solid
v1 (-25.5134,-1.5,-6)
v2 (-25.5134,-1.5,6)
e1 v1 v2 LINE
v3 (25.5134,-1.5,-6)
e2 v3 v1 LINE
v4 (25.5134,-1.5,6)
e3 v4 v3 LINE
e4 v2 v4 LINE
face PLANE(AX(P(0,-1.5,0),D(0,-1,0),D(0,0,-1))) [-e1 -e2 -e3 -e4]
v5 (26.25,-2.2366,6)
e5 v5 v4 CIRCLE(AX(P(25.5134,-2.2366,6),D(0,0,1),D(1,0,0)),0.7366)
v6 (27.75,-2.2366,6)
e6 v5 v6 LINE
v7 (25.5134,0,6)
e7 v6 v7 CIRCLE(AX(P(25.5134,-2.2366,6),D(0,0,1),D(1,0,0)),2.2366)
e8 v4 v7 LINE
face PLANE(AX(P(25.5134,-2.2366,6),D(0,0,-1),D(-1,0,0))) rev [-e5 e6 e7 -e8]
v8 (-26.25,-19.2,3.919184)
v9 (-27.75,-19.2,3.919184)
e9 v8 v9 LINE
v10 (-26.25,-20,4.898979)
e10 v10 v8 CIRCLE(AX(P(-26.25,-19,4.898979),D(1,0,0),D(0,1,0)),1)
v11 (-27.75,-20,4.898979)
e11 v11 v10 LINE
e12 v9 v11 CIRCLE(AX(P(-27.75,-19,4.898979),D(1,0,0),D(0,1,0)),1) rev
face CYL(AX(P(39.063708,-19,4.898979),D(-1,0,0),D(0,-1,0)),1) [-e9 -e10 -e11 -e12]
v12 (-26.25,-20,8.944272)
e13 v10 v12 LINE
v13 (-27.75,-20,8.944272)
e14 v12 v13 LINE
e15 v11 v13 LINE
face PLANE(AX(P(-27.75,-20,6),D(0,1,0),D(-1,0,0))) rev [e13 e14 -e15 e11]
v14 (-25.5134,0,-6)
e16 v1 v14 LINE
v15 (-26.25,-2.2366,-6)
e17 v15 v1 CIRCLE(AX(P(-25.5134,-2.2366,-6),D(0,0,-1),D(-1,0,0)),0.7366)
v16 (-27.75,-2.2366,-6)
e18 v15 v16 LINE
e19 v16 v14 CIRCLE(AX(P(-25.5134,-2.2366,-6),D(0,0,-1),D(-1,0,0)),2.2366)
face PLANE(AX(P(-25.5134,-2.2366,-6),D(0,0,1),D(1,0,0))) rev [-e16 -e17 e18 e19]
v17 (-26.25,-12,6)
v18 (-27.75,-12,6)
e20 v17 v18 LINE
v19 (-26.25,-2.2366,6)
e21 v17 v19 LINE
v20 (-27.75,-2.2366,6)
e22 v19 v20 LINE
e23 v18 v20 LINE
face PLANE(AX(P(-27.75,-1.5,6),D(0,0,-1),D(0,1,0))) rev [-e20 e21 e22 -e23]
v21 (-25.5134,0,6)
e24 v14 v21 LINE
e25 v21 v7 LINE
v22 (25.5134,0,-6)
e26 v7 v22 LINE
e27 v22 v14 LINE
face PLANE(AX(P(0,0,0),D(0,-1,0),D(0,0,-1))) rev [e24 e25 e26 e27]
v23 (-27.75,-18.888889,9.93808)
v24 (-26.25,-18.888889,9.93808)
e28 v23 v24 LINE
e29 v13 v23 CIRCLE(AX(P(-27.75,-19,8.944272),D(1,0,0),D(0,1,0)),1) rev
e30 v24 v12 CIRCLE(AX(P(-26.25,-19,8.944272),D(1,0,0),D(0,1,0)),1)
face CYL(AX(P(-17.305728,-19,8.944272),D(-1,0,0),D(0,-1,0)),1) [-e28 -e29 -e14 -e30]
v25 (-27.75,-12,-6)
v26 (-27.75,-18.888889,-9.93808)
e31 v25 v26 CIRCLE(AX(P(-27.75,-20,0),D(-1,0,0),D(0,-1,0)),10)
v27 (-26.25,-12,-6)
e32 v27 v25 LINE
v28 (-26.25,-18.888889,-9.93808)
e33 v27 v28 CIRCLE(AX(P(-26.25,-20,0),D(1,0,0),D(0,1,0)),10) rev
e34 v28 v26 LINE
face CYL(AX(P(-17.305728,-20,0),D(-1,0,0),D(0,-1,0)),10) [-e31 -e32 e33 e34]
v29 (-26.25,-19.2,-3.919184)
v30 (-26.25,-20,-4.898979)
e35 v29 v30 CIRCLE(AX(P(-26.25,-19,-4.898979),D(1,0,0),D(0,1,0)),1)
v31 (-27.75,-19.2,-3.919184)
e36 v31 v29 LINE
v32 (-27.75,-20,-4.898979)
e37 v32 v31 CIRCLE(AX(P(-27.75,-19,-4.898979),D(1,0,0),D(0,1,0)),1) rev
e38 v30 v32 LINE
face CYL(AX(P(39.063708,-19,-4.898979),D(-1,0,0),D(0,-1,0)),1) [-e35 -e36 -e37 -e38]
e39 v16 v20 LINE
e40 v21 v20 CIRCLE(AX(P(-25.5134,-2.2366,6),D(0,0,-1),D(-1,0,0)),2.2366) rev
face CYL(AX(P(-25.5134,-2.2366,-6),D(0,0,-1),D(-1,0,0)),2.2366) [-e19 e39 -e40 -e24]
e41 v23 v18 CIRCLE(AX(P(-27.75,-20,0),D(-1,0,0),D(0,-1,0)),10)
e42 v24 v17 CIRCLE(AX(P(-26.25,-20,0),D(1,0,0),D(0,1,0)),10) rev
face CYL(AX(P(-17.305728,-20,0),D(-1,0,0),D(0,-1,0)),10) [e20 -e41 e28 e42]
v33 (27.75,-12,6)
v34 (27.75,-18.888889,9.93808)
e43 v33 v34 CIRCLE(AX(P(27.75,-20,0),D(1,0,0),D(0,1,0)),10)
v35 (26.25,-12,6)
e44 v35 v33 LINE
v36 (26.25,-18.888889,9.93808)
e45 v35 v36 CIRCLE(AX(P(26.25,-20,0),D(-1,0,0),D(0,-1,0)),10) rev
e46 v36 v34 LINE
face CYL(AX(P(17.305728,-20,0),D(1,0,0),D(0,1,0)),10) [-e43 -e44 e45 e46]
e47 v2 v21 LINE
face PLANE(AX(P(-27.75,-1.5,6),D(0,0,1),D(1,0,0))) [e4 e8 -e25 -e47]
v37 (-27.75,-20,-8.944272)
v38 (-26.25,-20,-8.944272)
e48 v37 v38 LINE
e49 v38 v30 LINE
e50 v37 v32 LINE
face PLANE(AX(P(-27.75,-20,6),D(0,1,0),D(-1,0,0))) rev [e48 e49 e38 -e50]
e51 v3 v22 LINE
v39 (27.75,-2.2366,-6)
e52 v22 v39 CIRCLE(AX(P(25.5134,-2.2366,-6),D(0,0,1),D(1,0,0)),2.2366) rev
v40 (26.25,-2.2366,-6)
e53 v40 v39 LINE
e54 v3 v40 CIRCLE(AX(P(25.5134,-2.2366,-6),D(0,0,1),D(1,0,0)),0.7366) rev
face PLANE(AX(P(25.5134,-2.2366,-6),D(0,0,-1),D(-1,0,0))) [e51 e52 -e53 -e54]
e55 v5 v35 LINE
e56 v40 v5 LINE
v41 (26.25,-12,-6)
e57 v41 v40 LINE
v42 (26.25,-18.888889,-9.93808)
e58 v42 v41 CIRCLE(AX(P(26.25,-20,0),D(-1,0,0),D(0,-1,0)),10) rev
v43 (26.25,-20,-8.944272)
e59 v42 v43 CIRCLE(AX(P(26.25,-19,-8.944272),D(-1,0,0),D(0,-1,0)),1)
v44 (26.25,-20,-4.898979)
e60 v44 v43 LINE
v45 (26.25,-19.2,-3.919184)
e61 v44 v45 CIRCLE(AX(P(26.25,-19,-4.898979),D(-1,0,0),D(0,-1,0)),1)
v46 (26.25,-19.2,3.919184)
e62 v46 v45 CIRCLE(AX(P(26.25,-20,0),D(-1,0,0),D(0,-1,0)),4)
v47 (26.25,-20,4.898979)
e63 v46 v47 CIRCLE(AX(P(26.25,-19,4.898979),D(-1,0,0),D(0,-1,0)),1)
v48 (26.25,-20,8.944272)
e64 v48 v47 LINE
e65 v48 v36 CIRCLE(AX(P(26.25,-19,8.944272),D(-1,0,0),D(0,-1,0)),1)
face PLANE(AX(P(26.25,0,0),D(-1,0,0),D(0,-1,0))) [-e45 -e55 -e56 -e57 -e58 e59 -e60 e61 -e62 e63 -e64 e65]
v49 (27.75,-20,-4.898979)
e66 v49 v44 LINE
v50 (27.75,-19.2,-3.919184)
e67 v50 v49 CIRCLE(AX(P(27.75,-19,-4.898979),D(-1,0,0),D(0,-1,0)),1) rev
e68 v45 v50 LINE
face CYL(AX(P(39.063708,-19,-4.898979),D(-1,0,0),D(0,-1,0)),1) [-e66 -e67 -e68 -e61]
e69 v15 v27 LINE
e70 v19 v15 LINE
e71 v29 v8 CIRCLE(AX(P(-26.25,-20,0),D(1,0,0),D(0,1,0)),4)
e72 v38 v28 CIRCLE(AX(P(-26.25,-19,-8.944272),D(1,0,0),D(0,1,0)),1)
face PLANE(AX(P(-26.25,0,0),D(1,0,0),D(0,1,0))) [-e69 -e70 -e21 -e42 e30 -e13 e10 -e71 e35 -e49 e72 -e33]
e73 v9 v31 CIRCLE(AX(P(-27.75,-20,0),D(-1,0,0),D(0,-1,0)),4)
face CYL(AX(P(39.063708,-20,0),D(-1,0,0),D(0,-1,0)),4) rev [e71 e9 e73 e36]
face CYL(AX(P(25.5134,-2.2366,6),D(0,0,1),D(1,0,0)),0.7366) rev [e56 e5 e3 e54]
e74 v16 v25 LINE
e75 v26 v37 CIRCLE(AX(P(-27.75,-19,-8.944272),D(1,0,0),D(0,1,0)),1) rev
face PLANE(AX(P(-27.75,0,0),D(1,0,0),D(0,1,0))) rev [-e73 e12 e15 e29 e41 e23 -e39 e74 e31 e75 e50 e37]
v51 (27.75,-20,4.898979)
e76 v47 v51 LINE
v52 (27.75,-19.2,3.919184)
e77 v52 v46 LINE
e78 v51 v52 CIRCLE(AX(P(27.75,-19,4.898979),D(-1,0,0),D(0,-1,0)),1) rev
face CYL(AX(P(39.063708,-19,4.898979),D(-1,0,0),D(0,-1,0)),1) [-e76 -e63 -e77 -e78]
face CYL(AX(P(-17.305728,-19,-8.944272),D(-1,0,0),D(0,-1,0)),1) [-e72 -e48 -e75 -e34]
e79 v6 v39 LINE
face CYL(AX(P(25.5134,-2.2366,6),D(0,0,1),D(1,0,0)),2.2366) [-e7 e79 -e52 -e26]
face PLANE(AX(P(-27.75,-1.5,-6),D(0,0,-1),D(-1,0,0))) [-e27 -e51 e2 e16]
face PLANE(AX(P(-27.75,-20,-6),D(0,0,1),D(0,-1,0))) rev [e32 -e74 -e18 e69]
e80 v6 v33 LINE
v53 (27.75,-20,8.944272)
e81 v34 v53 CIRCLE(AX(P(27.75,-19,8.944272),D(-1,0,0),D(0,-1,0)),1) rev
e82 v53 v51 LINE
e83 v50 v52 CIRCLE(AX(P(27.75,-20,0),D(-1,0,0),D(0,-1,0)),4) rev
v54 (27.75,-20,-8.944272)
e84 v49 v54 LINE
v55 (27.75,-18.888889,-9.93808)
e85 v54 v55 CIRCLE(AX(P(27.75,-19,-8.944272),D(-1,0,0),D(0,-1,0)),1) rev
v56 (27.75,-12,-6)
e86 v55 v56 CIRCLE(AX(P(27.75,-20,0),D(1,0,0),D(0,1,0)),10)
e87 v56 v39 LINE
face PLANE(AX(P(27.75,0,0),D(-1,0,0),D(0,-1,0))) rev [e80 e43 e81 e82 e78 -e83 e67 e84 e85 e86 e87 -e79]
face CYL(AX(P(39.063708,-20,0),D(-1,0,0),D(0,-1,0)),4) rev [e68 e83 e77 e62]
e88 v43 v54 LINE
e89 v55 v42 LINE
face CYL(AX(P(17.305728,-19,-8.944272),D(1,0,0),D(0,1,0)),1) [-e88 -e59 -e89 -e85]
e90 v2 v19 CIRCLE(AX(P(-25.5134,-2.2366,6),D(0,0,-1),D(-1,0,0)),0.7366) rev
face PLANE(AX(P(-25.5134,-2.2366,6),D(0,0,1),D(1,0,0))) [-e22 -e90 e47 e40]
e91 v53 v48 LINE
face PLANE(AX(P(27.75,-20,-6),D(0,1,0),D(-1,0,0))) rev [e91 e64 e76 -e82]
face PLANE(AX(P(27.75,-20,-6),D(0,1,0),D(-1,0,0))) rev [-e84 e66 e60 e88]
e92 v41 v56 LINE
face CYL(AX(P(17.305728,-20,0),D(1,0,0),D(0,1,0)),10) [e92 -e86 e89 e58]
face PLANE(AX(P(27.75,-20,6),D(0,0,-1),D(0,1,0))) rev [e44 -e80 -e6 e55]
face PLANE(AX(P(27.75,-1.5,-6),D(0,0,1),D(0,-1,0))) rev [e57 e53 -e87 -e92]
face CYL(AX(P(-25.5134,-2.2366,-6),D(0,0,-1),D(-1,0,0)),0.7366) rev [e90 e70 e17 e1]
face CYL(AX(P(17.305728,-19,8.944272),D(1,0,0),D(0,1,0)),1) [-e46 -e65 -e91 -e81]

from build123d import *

# Parameters (mm, degrees)
CROQUIS2_W                         = 55.5
CROQUIS2_H                         = 12
BRIDA_BASE1_DEPTH                  = 1.5
BRIDA_DE_ARISTA1_STRIP_W           = 7.4732
BRIDA_DE_ARISTA1_STRIP_H           = 1.5
BRIDA_DE_ARISTA1_STRIP_CUT_DEPTH   = 12
BRIDA_DE_ARISTA1_STRIP_2_W         = 7.4732
BRIDA_DE_ARISTA1_STRIP_2_H         = 1.5
BRIDA_DE_ARISTA1_STRIP_CUT_2_DEPTH = 12
BRIDA_DE_ARISTA1_DEPTH             = 12
BRIDA_DE_ARISTA1_BEND_DEPTH        = 12
SALIENTE_EXTRUIR1_DEPTH            = 1.5
SALIENTE_EXTRUIR2_START            = -1.5
SALIENTE_EXTRUIR2_DEPTH            = 1.5
CORTAR_EXTRUIR2_REACH              = 61.835
CROQUIS17_R                        = 4
REDONDEO1_R                        = 1
REDONDEO2_R                        = 1


# Sheet-metal steps are written as plain solids
with BuildPart() as part:
    # Croquis2 → Brida base1 (new body)
    with BuildSketch(Plane(origin=(0, 0, 0), x_dir=(1, 0, 0), z_dir=(0, 1, 0))):
        Rectangle(CROQUIS2_W, CROQUIS2_H)
    extrude(amount=-BRIDA_BASE1_DEPTH)

    # Brida de arista1 strip (across the edge) → Brida de arista1 strip cut (cut)
    with BuildSketch(Plane(origin=(-27.75, -1.5, 6), x_dir=(1, 0, 0), z_dir=(0, 0, -1))):
        with Locations((-1.5, -0.75)):
            Rectangle(BRIDA_DE_ARISTA1_STRIP_W, BRIDA_DE_ARISTA1_STRIP_H)
    extrude(amount=BRIDA_DE_ARISTA1_STRIP_CUT_DEPTH, mode=Mode.SUBTRACT)

    # Brida de arista1 strip 2 (across the edge) → Brida de arista1 strip cut 2 (cut)
    with BuildSketch(Plane(origin=(27.75, -1.5, -6), x_dir=(-1, 0, 0), z_dir=(0, 0, 1))):
        with Locations((-1.5, -0.75)):
            Rectangle(BRIDA_DE_ARISTA1_STRIP_2_W, BRIDA_DE_ARISTA1_STRIP_2_H)
    extrude(amount=BRIDA_DE_ARISTA1_STRIP_CUT_2_DEPTH, mode=Mode.SUBTRACT)

    # Brida de arista1 section (across the edge) → Brida de arista1 (add)
    with BuildSketch(Plane(origin=(-27.75, -1.5, 6), x_dir=(1, 0, 0), z_dir=(0, 0, -1))):
        with BuildLine():
            Line((0, 0.7366), (0, 18.5))
            Line((0, 18.5), (1.5, 18.5))
            Line((1.5, 18.5), (1.5, 0.7366))
            ThreePointArc((1.5, 0.7366), (1.715745145, 0.215745145), (2.2366, 0))
            Line((2.2366, 0), (2.2366, -1.5))
            ThreePointArc((2.2366, -1.5), (0.655084973, -0.844915027), (0, 0.7366))
        make_face()
    extrude(amount=BRIDA_DE_ARISTA1_DEPTH)

    # Brida de arista1 section 2 (across the edge) → Brida de arista1 bend (add)
    with BuildSketch(Plane(origin=(27.75, -1.5, -6), x_dir=(-1, 0, 0), z_dir=(0, 0, 1))):
        with BuildLine():
            Line((0, 0.7366), (0, 18.5))
            Line((0, 18.5), (1.5, 18.5))
            Line((1.5, 18.5), (1.5, 0.7366))
            ThreePointArc((1.5, 0.7366), (1.715745145, 0.215745145), (2.2366, 0))
            Line((2.2366, 0), (2.2366, -1.5))
            ThreePointArc((2.2366, -1.5), (0.655084973, -0.844915027), (0, 0.7366))
        make_face()
    extrude(amount=BRIDA_DE_ARISTA1_BEND_DEPTH)

    # Croquis13 → Saliente-Extruir1 (add)
    with BuildSketch(Plane.ZY.offset(27.75)):
        with BuildLine():
            Line((-6, -20), (-10, -20))
            ThreePointArc((-10, -20), (-8.94427191, -15.527864045), (-6, -12))
            Line((-6, -12), (-6, -20))
        make_face()
        with BuildLine():
            Line((6, -20), (10, -20))
            ThreePointArc((10, -20), (8.94427191, -15.527864045), (6, -12))
            Line((6, -12), (6, -20))
        make_face()
    extrude(amount=-SALIENTE_EXTRUIR1_DEPTH)

    # Croquis16 → Saliente-Extruir2 (add)
    with BuildSketch(Plane(origin=(27.75, 0, 0), x_dir=(0, 0, -1), z_dir=(1, 0, 0)).offset(SALIENTE_EXTRUIR2_START)):
        with BuildLine():
            Line((-10, -20), (-6, -20))
            Line((-6, -20), (-6, -12))
            ThreePointArc((-6, -12), (-8.94427191, -15.527864045), (-10, -20))
        make_face()
        with BuildLine():
            Line((6, -20), (10, -20))
            ThreePointArc((10, -20), (8.94427191, -15.527864045), (6, -12))
            Line((6, -12), (6, -20))
        make_face()
    extrude(amount=SALIENTE_EXTRUIR2_DEPTH)

    # Cortar-Extruir2: up to this face of the body (flat: up to its plane)
    cortar_extruir2_end = Plane(part.part.faces().sort_by_distance((27.75, -12.121081048, 0))[0])
    # Croquis17 → Cortar-Extruir2 (cut, up to the picked face)
    with BuildSketch(Plane.ZY.offset(27.75), mode=Mode.PRIVATE) as cortar_extruir2_sk1:
        with Locations((0, -20)):
            Circle(CROQUIS17_R)
    cortar_extruir2_tool1 = split(extrude(cortar_extruir2_sk1.sketch, amount=-CORTAR_EXTRUIR2_REACH, mode=Mode.PRIVATE), bisect_by=cortar_extruir2_end, keep=Keep.BOTH, mode=Mode.PRIVATE)
    add(cortar_extruir2_tool1.solids().sort_by(Axis((-27.75, -20, 0), (1, 0, 0)))[0], mode=Mode.SUBTRACT)

    # Redondeo1
    redondeo1_edges = [part.edges().sort_by_distance(p)[0] for p in [
        (27, -20, -10),
        (27, -20, 10),
        (27, -20, 4),
        (27, -20, -4),
    ]]
    fillet(redondeo1_edges, radius=REDONDEO1_R)

    # Redondeo2
    redondeo2_edges = [part.edges().sort_by_distance(p)[0] for p in [
        (-27, -20, -4),
        (-27, -20, 4),
        (-27, -20, -10),
        (-27, -20, 10),
    ]]
    fillet(redondeo2_edges, radius=REDONDEO2_R)


solid = part.part
